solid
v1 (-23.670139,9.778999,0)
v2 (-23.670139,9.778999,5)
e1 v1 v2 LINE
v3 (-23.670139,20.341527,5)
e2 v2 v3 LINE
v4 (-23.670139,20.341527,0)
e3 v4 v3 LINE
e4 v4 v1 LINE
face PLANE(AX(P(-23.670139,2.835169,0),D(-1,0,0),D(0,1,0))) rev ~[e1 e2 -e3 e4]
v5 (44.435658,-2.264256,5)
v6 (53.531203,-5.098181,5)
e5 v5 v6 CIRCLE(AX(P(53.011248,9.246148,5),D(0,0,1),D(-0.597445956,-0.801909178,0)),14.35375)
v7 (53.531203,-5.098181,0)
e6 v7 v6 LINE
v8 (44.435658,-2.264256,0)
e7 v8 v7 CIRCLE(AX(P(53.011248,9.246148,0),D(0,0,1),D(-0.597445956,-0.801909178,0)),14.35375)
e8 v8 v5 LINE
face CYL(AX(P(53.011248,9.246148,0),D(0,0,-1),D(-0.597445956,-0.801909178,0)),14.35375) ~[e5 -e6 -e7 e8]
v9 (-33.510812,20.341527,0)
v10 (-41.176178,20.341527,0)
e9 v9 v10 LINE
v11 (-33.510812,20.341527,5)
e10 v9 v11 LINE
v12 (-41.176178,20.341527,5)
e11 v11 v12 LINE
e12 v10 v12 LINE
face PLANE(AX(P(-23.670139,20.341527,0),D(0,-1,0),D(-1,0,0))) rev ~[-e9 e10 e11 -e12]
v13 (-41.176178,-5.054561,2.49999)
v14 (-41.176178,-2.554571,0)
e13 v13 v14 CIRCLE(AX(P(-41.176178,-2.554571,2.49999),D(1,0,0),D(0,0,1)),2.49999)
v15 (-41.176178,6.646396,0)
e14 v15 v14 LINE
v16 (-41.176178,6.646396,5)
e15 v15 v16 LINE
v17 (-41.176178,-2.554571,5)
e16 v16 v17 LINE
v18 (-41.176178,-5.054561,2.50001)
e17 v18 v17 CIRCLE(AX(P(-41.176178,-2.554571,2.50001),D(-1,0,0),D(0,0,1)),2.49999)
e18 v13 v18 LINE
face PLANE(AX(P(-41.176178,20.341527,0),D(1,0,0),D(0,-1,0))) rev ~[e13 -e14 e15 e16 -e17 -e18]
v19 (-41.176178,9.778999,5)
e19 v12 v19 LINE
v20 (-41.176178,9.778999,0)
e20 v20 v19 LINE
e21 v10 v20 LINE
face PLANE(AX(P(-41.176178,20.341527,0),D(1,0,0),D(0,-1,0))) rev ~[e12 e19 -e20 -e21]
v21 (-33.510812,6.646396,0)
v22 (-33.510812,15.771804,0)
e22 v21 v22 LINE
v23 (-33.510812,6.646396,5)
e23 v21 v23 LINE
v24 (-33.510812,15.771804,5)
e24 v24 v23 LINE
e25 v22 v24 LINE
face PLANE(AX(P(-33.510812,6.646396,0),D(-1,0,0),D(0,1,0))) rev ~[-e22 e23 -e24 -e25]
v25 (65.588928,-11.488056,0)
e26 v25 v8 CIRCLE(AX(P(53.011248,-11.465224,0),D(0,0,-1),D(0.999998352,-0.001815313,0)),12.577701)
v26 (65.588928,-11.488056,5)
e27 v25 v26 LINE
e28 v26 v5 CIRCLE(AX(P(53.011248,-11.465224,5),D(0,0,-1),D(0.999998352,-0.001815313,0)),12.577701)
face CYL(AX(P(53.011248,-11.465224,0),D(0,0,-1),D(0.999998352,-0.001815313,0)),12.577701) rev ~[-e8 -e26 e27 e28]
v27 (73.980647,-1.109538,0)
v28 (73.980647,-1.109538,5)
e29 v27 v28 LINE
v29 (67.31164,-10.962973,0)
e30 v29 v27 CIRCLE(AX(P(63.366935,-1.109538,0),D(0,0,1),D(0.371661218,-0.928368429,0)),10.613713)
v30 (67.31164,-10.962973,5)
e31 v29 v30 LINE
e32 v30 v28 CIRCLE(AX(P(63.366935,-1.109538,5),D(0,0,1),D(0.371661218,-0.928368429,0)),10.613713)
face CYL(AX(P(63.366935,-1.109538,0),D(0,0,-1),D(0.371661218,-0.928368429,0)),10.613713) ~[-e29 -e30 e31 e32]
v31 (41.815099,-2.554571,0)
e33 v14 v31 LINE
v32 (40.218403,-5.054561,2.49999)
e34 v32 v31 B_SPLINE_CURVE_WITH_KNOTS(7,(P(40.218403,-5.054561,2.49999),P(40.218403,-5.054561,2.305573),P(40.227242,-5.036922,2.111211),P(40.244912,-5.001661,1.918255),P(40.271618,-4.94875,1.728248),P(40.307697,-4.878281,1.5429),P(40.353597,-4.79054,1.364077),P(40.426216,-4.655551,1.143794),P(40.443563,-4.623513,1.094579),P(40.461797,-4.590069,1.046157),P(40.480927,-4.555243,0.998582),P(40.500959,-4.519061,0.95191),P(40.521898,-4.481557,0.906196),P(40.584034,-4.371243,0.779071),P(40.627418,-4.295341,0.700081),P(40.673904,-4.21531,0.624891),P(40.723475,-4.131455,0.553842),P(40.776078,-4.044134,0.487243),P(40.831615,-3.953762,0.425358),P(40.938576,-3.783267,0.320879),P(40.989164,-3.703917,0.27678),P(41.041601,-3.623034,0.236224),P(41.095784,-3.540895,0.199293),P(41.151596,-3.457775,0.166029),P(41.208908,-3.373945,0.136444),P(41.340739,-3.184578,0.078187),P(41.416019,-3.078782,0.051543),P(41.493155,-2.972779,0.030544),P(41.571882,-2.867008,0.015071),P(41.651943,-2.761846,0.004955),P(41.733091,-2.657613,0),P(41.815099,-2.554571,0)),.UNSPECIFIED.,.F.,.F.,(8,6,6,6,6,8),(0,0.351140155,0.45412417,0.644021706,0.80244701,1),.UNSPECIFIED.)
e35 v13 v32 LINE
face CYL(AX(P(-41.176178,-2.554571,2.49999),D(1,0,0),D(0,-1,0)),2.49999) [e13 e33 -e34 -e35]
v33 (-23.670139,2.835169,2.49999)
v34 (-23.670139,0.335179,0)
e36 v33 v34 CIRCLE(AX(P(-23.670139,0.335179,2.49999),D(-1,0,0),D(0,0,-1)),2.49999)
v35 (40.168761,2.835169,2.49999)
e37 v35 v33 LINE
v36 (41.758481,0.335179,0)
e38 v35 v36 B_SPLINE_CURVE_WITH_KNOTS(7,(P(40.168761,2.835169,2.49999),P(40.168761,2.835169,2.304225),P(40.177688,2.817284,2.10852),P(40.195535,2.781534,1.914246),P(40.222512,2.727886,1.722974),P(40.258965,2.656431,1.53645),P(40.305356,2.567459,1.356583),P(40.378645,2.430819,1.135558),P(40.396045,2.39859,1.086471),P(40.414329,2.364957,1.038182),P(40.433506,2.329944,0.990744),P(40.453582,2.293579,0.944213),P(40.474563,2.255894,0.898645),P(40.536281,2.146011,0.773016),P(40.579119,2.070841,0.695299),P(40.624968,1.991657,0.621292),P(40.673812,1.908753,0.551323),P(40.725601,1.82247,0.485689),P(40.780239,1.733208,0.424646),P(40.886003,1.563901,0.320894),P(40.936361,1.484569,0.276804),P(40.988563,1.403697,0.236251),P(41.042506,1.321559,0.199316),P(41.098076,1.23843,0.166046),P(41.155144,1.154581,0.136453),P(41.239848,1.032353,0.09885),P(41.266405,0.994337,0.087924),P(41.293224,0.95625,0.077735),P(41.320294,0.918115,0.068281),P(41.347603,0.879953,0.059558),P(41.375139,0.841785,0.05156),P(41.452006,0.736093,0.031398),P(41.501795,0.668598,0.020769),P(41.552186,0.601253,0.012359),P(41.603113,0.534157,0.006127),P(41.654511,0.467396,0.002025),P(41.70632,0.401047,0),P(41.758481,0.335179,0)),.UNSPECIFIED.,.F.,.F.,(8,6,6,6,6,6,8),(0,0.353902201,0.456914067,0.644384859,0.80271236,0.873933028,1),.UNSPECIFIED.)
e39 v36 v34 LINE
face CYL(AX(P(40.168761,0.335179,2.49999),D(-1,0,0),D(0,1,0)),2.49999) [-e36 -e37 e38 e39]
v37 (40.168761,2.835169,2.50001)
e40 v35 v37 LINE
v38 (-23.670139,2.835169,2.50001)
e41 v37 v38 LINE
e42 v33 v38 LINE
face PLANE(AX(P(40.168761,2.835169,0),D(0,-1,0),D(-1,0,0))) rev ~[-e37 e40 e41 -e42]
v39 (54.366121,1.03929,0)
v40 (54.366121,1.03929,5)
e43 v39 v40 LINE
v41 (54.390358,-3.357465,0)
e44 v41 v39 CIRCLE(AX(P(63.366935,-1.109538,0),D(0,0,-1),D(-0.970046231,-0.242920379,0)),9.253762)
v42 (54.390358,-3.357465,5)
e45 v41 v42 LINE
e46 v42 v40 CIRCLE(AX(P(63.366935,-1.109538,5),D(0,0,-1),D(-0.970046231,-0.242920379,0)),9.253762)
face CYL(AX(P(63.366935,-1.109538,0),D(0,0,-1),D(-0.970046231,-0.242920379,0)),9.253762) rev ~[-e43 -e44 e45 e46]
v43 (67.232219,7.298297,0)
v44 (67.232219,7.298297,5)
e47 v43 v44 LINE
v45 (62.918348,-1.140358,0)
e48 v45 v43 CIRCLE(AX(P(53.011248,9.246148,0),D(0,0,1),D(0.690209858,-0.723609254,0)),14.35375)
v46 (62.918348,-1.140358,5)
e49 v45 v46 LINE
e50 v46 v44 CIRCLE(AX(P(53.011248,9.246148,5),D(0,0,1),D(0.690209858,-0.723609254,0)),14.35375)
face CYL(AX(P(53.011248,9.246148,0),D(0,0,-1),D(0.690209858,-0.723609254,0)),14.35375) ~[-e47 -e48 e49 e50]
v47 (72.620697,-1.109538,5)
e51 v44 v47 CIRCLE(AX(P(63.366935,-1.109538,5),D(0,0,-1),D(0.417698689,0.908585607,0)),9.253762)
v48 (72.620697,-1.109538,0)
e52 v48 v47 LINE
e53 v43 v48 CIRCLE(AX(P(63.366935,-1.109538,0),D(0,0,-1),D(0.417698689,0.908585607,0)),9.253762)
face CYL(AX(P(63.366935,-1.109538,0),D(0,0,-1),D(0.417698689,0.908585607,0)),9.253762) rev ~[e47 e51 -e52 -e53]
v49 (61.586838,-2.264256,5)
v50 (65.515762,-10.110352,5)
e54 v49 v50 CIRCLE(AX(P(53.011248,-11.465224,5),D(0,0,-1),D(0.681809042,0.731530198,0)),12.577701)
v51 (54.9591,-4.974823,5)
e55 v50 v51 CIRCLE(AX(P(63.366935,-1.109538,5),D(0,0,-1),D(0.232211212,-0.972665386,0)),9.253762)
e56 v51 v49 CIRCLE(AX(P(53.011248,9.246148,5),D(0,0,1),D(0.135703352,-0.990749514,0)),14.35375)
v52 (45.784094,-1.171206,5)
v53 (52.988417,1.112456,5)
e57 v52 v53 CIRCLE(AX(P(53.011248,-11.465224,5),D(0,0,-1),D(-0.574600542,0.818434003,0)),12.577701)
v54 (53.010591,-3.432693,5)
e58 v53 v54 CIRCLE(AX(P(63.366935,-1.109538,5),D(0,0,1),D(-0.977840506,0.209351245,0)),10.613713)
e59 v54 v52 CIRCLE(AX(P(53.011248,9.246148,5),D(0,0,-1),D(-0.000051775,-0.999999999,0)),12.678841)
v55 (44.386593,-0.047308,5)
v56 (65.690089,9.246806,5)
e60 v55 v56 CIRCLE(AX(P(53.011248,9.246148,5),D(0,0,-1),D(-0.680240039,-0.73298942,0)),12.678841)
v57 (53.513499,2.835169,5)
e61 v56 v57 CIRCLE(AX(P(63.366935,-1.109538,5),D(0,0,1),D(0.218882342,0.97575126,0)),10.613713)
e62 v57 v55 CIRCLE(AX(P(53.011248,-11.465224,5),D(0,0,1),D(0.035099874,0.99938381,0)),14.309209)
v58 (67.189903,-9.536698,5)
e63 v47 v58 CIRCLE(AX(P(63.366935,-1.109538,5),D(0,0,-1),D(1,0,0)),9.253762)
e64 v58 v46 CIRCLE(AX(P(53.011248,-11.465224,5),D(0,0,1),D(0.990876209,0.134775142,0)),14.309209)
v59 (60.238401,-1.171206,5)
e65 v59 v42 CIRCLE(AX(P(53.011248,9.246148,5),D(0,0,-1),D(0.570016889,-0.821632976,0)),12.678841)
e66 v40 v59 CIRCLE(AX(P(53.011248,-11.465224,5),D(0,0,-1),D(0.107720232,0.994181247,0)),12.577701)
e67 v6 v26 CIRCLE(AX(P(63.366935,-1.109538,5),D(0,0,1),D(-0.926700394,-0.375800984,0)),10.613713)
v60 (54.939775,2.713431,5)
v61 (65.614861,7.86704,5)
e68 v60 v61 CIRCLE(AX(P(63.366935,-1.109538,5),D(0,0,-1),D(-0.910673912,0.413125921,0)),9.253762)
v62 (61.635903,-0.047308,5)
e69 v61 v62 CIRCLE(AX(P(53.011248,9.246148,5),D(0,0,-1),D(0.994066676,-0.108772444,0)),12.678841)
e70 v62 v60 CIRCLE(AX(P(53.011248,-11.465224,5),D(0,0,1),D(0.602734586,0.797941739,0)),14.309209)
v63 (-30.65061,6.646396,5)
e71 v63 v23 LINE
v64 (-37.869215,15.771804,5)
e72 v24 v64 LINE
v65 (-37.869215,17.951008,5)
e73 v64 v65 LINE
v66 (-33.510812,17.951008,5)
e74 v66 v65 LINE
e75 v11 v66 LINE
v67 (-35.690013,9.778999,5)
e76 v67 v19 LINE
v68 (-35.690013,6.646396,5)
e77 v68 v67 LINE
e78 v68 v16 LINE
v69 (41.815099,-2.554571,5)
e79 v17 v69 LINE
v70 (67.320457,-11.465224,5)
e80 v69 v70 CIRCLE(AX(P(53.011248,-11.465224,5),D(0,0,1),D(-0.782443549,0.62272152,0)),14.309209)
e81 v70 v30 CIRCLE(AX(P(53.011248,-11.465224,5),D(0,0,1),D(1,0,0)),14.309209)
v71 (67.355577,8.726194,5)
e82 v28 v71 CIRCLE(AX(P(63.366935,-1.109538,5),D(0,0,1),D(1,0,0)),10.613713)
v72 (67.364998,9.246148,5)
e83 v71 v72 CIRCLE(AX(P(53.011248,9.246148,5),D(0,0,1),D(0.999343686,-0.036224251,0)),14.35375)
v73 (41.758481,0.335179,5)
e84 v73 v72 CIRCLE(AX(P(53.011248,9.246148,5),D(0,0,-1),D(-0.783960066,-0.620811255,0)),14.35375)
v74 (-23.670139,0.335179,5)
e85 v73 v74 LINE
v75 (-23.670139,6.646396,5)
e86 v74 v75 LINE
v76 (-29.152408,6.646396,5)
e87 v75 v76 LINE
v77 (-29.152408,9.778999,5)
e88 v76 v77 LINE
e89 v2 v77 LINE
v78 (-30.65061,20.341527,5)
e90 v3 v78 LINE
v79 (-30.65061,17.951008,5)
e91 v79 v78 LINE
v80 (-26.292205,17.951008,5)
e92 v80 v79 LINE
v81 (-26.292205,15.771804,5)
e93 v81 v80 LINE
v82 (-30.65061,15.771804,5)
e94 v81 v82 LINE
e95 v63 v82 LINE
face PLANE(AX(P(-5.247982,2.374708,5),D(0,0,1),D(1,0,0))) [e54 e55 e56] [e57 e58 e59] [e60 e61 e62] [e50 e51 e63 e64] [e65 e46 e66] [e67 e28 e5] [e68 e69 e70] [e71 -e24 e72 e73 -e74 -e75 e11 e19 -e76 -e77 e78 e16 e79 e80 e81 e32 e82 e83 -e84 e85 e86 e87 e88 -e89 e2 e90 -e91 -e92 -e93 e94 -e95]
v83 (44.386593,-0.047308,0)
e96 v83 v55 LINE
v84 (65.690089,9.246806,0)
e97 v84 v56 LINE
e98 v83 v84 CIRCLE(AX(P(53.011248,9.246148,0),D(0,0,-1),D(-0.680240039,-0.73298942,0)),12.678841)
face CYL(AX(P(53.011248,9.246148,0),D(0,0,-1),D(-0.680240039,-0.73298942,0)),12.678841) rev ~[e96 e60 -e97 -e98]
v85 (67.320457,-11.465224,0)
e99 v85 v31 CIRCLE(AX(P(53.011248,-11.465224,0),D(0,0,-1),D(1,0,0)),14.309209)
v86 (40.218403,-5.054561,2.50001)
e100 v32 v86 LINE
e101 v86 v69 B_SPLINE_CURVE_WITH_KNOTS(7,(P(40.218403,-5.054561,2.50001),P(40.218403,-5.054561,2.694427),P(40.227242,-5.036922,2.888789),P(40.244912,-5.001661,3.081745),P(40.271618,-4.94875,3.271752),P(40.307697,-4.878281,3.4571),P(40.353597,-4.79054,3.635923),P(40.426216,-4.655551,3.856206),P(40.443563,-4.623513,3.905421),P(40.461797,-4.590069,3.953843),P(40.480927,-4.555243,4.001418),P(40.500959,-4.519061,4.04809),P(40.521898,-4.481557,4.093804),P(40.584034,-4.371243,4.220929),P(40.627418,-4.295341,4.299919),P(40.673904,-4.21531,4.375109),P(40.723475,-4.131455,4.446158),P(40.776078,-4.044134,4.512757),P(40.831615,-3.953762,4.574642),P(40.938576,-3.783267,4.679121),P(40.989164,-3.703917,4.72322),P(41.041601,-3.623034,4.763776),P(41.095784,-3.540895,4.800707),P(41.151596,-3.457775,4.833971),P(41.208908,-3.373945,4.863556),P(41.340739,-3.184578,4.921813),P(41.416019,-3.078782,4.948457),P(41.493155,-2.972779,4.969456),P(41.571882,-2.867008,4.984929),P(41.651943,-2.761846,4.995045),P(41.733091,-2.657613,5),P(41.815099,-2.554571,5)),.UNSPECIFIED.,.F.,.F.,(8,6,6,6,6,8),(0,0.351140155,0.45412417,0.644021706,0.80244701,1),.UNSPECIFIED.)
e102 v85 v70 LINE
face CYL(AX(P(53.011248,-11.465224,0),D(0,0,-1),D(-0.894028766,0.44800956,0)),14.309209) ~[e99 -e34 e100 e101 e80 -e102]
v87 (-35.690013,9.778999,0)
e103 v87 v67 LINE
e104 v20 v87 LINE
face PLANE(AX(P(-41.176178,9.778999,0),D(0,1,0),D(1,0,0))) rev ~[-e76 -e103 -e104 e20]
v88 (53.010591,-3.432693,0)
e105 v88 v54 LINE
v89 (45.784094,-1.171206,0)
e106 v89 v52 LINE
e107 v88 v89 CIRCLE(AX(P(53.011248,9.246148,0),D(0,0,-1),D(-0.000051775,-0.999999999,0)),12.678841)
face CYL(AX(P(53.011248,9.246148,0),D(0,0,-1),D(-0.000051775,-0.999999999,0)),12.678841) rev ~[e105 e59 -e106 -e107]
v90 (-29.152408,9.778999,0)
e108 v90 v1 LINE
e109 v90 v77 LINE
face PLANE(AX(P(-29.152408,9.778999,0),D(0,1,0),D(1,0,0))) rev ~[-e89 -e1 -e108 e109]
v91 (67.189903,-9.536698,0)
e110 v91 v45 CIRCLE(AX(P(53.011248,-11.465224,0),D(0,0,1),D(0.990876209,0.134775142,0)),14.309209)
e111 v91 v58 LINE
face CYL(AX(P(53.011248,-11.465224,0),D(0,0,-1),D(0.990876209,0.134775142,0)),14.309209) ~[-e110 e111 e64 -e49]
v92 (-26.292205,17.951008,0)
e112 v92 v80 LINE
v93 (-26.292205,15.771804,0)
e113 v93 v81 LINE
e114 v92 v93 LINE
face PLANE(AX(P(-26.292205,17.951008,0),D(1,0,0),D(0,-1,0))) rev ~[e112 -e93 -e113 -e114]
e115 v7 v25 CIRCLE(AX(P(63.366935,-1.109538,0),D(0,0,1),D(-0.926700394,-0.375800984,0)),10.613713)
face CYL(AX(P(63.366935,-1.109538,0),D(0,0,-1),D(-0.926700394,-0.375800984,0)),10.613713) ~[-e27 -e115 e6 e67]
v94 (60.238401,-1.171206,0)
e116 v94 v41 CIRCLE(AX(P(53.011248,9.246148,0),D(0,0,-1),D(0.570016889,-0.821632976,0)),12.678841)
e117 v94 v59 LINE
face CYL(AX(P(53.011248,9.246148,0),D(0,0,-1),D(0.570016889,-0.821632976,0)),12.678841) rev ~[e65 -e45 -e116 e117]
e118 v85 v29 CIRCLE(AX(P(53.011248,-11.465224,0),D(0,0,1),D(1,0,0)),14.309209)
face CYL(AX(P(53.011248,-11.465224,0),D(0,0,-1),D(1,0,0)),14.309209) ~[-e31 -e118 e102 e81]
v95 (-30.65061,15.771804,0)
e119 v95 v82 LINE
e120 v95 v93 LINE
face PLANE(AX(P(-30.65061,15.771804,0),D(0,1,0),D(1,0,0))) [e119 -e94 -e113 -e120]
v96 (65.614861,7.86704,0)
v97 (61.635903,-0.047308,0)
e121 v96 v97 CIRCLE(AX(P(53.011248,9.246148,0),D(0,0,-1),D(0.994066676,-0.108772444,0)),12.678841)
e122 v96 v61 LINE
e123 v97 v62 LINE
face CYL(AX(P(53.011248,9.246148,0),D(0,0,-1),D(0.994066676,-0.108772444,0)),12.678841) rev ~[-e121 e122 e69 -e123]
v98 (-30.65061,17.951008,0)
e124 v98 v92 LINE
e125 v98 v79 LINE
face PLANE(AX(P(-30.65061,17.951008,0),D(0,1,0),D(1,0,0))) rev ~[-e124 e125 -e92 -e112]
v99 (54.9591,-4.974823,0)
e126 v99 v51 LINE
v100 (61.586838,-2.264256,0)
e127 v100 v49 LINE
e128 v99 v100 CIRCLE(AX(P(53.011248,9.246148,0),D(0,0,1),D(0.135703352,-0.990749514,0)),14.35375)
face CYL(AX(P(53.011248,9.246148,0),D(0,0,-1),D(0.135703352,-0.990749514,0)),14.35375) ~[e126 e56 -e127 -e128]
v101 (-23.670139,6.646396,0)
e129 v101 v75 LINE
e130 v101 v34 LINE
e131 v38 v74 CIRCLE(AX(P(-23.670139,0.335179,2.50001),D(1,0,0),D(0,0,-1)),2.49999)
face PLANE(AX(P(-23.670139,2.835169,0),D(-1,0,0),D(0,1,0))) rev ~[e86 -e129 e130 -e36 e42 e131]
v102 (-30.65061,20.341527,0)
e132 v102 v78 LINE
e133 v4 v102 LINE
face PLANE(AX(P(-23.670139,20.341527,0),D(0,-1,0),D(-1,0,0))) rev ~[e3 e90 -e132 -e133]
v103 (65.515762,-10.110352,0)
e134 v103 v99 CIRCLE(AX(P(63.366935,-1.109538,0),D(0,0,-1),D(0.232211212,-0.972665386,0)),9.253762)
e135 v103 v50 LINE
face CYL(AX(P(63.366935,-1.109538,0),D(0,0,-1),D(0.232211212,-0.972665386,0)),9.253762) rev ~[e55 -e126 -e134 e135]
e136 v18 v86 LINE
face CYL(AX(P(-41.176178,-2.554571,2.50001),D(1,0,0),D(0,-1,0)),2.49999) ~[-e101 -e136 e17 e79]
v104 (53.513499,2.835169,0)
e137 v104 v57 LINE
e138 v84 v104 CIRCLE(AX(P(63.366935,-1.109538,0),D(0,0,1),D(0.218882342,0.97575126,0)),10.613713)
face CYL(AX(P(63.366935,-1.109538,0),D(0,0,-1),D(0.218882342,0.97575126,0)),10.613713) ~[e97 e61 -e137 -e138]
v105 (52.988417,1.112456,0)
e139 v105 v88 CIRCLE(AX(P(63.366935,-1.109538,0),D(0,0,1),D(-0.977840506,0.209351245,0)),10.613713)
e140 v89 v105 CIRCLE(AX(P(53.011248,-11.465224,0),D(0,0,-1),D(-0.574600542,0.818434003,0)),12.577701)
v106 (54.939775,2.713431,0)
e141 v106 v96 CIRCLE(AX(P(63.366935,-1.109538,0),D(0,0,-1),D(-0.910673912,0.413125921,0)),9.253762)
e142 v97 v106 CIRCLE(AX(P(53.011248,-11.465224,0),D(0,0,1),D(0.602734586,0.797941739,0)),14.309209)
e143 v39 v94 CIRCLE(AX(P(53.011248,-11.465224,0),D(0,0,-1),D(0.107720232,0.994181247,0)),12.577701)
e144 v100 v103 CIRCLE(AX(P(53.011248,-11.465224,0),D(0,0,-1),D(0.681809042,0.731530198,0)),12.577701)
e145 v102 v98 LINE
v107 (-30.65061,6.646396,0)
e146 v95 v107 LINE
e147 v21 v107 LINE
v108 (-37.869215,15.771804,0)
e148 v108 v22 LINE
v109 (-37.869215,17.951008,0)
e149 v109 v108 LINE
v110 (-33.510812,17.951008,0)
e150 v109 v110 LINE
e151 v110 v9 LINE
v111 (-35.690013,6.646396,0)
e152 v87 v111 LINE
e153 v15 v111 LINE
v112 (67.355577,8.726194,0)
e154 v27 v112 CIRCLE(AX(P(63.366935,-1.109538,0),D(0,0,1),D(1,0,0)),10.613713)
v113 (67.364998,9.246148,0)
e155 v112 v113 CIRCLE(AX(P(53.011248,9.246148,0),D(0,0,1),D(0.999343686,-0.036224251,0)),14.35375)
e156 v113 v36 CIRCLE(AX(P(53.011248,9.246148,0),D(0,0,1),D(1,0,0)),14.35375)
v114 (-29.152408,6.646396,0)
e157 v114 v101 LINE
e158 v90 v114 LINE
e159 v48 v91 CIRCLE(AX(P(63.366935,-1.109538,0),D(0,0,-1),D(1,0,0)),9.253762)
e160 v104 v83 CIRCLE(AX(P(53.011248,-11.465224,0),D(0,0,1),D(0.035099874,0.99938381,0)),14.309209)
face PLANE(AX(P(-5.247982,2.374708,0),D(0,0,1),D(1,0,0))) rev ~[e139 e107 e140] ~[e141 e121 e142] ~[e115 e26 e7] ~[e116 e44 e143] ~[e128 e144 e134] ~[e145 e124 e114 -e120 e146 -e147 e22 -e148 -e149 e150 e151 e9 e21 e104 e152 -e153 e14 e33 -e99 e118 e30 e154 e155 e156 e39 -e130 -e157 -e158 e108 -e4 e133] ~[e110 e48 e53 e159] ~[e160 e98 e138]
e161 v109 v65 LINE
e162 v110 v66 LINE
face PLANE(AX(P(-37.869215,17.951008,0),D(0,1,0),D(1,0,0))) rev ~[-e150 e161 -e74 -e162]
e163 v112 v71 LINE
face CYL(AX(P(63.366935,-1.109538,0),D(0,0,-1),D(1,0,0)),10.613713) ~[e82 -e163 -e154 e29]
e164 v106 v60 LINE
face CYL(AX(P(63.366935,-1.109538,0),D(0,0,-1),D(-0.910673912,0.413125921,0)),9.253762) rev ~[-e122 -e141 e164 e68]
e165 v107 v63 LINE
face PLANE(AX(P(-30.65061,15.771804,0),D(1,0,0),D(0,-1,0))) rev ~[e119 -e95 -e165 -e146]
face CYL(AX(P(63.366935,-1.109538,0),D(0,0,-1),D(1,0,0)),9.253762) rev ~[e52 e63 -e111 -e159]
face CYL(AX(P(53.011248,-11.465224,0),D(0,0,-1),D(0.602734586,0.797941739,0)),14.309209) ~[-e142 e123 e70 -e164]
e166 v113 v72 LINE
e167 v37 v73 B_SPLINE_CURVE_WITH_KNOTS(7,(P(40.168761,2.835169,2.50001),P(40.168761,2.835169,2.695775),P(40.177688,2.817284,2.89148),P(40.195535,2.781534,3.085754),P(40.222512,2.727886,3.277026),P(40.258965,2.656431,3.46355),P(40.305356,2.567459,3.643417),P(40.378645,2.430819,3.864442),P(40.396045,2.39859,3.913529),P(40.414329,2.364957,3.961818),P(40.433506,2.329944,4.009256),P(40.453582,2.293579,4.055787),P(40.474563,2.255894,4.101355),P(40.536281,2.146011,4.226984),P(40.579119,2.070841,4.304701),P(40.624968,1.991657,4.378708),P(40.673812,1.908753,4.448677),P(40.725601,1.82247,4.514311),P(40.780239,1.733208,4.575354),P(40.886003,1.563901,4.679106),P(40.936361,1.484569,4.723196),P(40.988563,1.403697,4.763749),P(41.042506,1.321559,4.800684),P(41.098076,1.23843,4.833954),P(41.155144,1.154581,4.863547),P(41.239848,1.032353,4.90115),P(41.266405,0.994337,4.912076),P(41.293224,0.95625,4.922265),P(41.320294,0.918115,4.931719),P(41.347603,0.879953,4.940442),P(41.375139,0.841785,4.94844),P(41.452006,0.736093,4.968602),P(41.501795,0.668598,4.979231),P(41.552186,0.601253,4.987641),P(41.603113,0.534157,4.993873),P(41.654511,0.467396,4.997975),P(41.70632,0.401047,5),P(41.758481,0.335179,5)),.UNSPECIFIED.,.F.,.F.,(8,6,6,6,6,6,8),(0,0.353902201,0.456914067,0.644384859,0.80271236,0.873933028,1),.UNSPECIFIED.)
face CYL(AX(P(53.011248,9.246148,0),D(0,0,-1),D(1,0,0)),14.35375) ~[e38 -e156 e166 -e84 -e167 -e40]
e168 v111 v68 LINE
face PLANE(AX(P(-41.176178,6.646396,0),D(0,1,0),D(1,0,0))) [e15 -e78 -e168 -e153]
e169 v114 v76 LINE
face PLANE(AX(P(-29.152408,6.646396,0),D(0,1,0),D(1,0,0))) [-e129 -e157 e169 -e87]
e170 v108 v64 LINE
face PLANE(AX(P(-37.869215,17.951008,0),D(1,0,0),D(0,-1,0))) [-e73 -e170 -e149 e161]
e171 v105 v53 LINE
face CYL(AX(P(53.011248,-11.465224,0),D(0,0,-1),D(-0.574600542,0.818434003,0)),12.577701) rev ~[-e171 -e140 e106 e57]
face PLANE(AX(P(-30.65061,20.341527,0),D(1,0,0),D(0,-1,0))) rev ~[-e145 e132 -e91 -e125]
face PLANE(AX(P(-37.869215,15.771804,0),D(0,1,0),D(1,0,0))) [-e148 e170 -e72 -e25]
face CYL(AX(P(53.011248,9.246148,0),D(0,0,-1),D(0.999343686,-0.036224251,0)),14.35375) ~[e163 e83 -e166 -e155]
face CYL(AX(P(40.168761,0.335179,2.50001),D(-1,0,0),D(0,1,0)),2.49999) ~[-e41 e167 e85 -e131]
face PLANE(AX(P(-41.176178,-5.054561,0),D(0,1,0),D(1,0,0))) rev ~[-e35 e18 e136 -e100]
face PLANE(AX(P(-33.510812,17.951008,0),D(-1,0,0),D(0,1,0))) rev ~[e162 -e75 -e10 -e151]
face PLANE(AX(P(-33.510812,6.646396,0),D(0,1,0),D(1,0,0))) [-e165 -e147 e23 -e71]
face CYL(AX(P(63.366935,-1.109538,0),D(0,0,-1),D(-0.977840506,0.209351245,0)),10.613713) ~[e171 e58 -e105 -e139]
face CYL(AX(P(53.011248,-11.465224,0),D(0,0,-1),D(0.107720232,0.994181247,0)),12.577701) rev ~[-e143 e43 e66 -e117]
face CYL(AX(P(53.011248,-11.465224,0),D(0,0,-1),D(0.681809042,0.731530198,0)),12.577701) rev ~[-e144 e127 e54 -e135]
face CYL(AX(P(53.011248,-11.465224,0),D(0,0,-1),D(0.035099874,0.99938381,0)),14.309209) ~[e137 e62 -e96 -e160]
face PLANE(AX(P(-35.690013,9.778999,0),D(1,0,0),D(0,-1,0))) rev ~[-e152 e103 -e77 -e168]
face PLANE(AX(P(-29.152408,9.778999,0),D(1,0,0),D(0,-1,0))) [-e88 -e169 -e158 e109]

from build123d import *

# Parameters (mm, degrees)
F1_DEPTH = 5
F2_R     = 2.49999
F3_W     = 5.486164242
F3_H     = 3.1326031312
F3_W_2   = 5.482269451
F3_W_3   = 2.8602015227
F3_H_2   = 9.1254087165
F3_H_3   = 2.179203555
F3_H_4   = 2.3905187845
F3_W_4   = 4.3584052473
F3_W_5   = 4.3584033847
F4_DEPTH = 25


# Not quite as in the source:
# - a fillet or chamfer is up to 0.001 mm smaller than in the source, because OpenCascade refuses the exact size


with BuildPart() as f1:
    # F0 (on Top) → F1 (new body)
    with BuildSketch(Plane.XY):
        with BuildLine():
            ThreePointArc((43.1041480843, -1.140358212), (41.4640780002, 0.7201286462), (40.168760519, 2.8351685639))
            Line((40.168760519, 2.8351685639), (-23.6701387912, 2.8351685639))
            Line((-23.6701387912, 2.8351685639), (-23.6701387912, 20.3415267169))
            Line((-23.6701387912, 20.3415267169), (-41.1761775613, 20.3415267169))
            Line((-41.1761775613, 20.3415267169), (-41.1761775613, 2.8351685639))
            Line((-41.1761775613, 2.8351685639), (-41.1761775613, -5.0545609556))
            Line((-41.1761775613, -5.0545609556), (40.2184031878, -5.0545609556))
            ThreePointArc((40.2184031878, -5.0545609556), (41.4937778577, -2.9739718927), (43.1041480843, -1.140358212))
        make_face()
        with BuildLine():
            ThreePointArc((67.3555774067, 8.7261943334), (67.3626426338, 8.9861285841), (67.3649979671, 9.246148169))
            ThreePointArc((67.3649979671, 9.246148169), (49.7178994981, 23.2169748342), (40.168760519, 2.8351685639))
            ThreePointArc((40.168760519, 2.8351685639), (41.4640780002, 0.7201286462), (43.1041480843, -1.140358212))
            ThreePointArc((43.1041480843, -1.140358212), (43.7292665999, -0.5749391558), (44.3865925628, -0.0473081805))
            ThreePointArc((44.3865925628, -0.0473081805), (47.9413125892, 20.8671965928), (65.6900889224, 9.2468057623))
            ThreePointArc((65.6900889224, 9.2468057623), (66.5335502723, 9.0207851567), (67.3555774067, 8.7261943334))
        make_face()
        with BuildLine():
            ThreePointArc((44.4356579567, -2.2642557619), (43.7528332621, -1.7225299618), (43.1041480843, -1.140358212))
            ThreePointArc((43.1041480843, -1.140358212), (41.4937778577, -2.9739718927), (40.2184031878, -5.0545609556))
            ThreePointArc((40.2184031878, -5.0545609556), (49.7174675435, -25.3901824255), (67.3204571559, -11.4652235061))
            ThreePointArc((67.3204571559, -11.4652235061), (67.3182526979, -11.2140597341), (67.3116400033, -10.96297335))
            ThreePointArc((67.3116400033, -10.96297335), (66.4614410979, -11.2621198468), (65.5889276735, -11.4880559652))
            ThreePointArc((65.5889276735, -11.4880559652), (47.9839421141, -22.9945229972), (44.4356579567, -2.2642557619))
        make_face()
        with BuildLine():
            ThreePointArc((73.9806472497, -1.1095376685), (72.169922865, 4.8199052741), (67.3555774067, 8.7261943334))
            ThreePointArc((67.3555774067, 8.7261943334), (67.3117311725, 8.010705268), (67.2322189831, 7.2982974448))
            ThreePointArc((67.2322189831, 7.2982974448), (71.1579723309, 3.8836422981), (72.6206968225, -1.1095376685))
            ThreePointArc((72.6206968225, -1.1095376685), (71.1453970138, -6.1222851765), (67.1899029185, -9.5366978003))
            ThreePointArc((67.1899029185, -9.5366978003), (67.2686178092, -10.2483123334), (67.3116400033, -10.96297335))
            ThreePointArc((67.3116400033, -10.96297335), (72.1566691186, -7.0586101253), (73.9806472497, -1.1095376685))
        make_face()
        with BuildLine():
            ThreePointArc((54.9590998914, -4.9748227507), (54.2466920753, -5.0543350042), (53.5312030139, -5.0981813027))
            ThreePointArc((53.5312030139, -5.0981813027), (58.3970374227, -10.4877579943), (65.5889276735, -11.4880559652))
            ThreePointArc((65.5889276735, -11.4880559652), (65.5889432165, -11.4766397403), (65.5889483975, -11.4652235061))
            ThreePointArc((65.5889483975, -11.4652235061), (65.5706384672, -10.7868000494), (65.5157619854, -10.1103518165))
            ThreePointArc((65.5157619854, -10.1103518165), (59.3188229712, -9.4308900821), (54.9590998914, -4.9748227507))
        make_face()
        with BuildLine():
            ThreePointArc((54.3661207024, 1.0392904692), (53.6782725799, 1.094777615), (52.9884165603, 1.1124562812))
            ThreePointArc((52.9884165603, 1.1124562812), (52.7533483797, -1.1613192361), (53.0105914352, -3.4326928652))
            ThreePointArc((53.0105914352, -3.4326928652), (53.7015001008, -3.4138898359), (54.3903575498, -3.3574650805))
            ThreePointArc((54.3903575498, -3.3574650805), (54.1133130855, -1.1605476943), (54.3661207024, 1.0392904692))
        make_face()
        with BuildLine():
            ThreePointArc((65.6900889395, 9.246148169), (65.6900889352, 9.2464769657), (65.6900889224, 9.2468057623))
            ThreePointArc((65.6900889224, 9.2468057623), (58.421880956, 8.2818061592), (53.5134993303, 2.8351685639))
            ThreePointArc((53.5134993303, 2.8351685639), (54.2281603431, 2.7921463054), (54.9397748692, 2.7134313507))
            ThreePointArc((54.9397748692, 2.7134313507), (59.3437953002, 7.2239168329), (65.6148612618, 7.867039641))
            ThreePointArc((65.6148612618, 7.867039641), (65.6712680509, 8.5555687863), (65.6900889395, 9.246148169))
        make_face()
        with BuildLine():
            ThreePointArc((60.2384014175, -1.1712057304), (60.9570485035, -0.6339967178), (61.6359032137, -0.0473081805))
            ThreePointArc((61.6359032137, -0.0473081805), (58.4654054664, 1.7637460297), (54.9397748692, 2.7134313507))
            ThreePointArc((54.9397748692, 2.7134313507), (54.6128353821, 1.8901056598), (54.3661207024, 1.0392904692))
            ThreePointArc((54.3661207024, 1.0392904692), (57.4423163149, 0.3061053356), (60.2384014175, -1.1712057304))
        make_face()
        with BuildLine():
            ThreePointArc((53.5134993303, 2.8351685639), (48.7018941946, 2.1796634707), (44.3865925628, -0.0473081805))
            ThreePointArc((44.3865925628, -0.0473081805), (45.0654472729, -0.6339967178), (45.7840943589, -1.1712057304))
            ThreePointArc((45.7840943589, -1.1712057304), (49.2106758058, 0.5245305343), (52.9884165603, 1.1124562812))
            ThreePointArc((52.9884165603, 1.1124562812), (53.2143527571, 1.9849696853), (53.5134993303, 2.8351685639))
        make_face()
        with BuildLine():
            ThreePointArc((44.3865925628, -0.0473081805), (43.7292665999, -0.5749391558), (43.1041480843, -1.140358212))
            ThreePointArc((43.1041480843, -1.140358212), (43.7528332621, -1.7225299618), (44.4356579567, -2.2642557619))
            ThreePointArc((44.4356579567, -2.2642557619), (45.0909975882, -1.6944412812), (45.7840943589, -1.1712057304))
            ThreePointArc((45.7840943589, -1.1712057304), (45.0654472729, -0.6339967178), (44.3865925628, -0.0473081805))
        make_face()
        with BuildLine():
            ThreePointArc((45.7840943589, -1.1712057304), (45.0909975882, -1.6944412812), (44.4356579567, -2.2642557619))
            ThreePointArc((44.4356579567, -2.2642557619), (48.7414590733, -4.4578309904), (53.5312030139, -5.0981813027))
            ThreePointArc((53.5312030139, -5.0981813027), (53.2366121166, -4.2761541948), (53.0105914352, -3.4326928652))
            ThreePointArc((53.0105914352, -3.4326928652), (49.2245751666, -2.854022082), (45.7840943589, -1.1712057304))
        make_face()
        with BuildLine():
            ThreePointArc((53.0105914352, -3.4326928652), (53.2366121166, -4.2761541948), (53.5312030139, -5.0981813027))
            ThreePointArc((53.5312030139, -5.0981813027), (54.2466920753, -5.0543350042), (54.9590998914, -4.9748227507))
            ThreePointArc((54.9590998914, -4.9748227507), (54.6371920778, -4.1793436416), (54.3903575498, -3.3574650805))
            ThreePointArc((54.3903575498, -3.3574650805), (53.7015001008, -3.4138898359), (53.0105914352, -3.4326928652))
        make_face()
        with BuildLine():
            ThreePointArc((54.9397748692, 2.7134313507), (54.2281603431, 2.7921463054), (53.5134993303, 2.8351685639))
            ThreePointArc((53.5134993303, 2.8351685639), (53.2143527571, 1.9849696853), (52.9884165603, 1.1124562812))
            ThreePointArc((52.9884165603, 1.1124562812), (53.6782725799, 1.094777615), (54.3661207024, 1.0392904692))
            ThreePointArc((54.3661207024, 1.0392904692), (54.6128353821, 1.8901056598), (54.9397748692, 2.7134313507))
        make_face()
        with BuildLine():
            ThreePointArc((54.9590998914, -4.9748227507), (58.4447091137, -4.0394696351), (61.5868378197, -2.2642557619))
            ThreePointArc((61.5868378197, -2.2642557619), (60.9314981882, -1.6944412812), (60.2384014175, -1.1712057304))
            ThreePointArc((60.2384014175, -1.1712057304), (57.4510535162, -2.6299259461), (54.3903575498, -3.3574650805))
            ThreePointArc((54.3903575498, -3.3574650805), (54.6371920778, -4.1793436416), (54.9590998914, -4.9748227507))
        make_face()
        with BuildLine():
            ThreePointArc((61.5868378197, -2.2642557619), (62.2696625143, -1.7225299618), (62.9183476921, -1.140358212))
            ThreePointArc((62.9183476921, -1.140358212), (62.2932291765, -0.5749391558), (61.6359032137, -0.0473081805))
            ThreePointArc((61.6359032137, -0.0473081805), (60.9570485035, -0.6339967178), (60.2384014175, -1.1712057304))
            ThreePointArc((60.2384014175, -1.1712057304), (60.9314981882, -1.6944412812), (61.5868378197, -2.2642557619))
        make_face()
        with BuildLine():
            ThreePointArc((62.9183476921, -1.140358212), (65.7918456304, 2.7126603808), (67.2322189831, 7.2982974448))
            ThreePointArc((67.2322189831, 7.2982974448), (66.4367398451, 7.6202051868), (65.6148612618, 7.867039641))
            ThreePointArc((65.6148612618, 7.867039641), (64.3390487935, 3.5510680946), (61.6359032137, -0.0473081805))
            ThreePointArc((61.6359032137, -0.0473081805), (62.2932291765, -0.5749391558), (62.9183476921, -1.140358212))
        make_face()
        with BuildLine():
            ThreePointArc((67.2322189831, 7.2982974448), (67.3117311725, 8.010705268), (67.3555774067, 8.7261943334))
            ThreePointArc((67.3555774067, 8.7261943334), (66.5335502723, 9.0207851567), (65.6900889224, 9.2468057623))
            ThreePointArc((65.6900889224, 9.2468057623), (65.6900889352, 9.2464769657), (65.6900889395, 9.246148169))
            ThreePointArc((65.6900889395, 9.246148169), (65.6712680509, 8.5555687863), (65.6148612618, 7.867039641))
            ThreePointArc((65.6148612618, 7.867039641), (66.4367398451, 7.6202051868), (67.2322189831, 7.2982974448))
        make_face()
        with BuildLine():
            ThreePointArc((67.1899029185, -9.5366978003), (65.7648954489, -4.9769306827), (62.9183476921, -1.140358212))
            ThreePointArc((62.9183476921, -1.140358212), (62.2696625143, -1.7225299618), (61.5868378197, -2.2642557619))
            ThreePointArc((61.5868378197, -2.2642557619), (64.2577141016, -5.8335676384), (65.5157619854, -10.1103518165))
            ThreePointArc((65.5157619854, -10.1103518165), (66.3665771981, -9.8636372133), (67.1899029185, -9.5366978003))
        make_face()
        with BuildLine():
            ThreePointArc((65.5889276735, -11.4880559652), (66.4614410979, -11.2621198468), (67.3116400033, -10.96297335))
            ThreePointArc((67.3116400033, -10.96297335), (67.2686178092, -10.2483123334), (67.1899029185, -9.5366978003))
            ThreePointArc((67.1899029185, -9.5366978003), (66.3665771981, -9.8636372133), (65.5157619854, -10.1103518165))
            ThreePointArc((65.5157619854, -10.1103518165), (65.5706384672, -10.7868000494), (65.5889483975, -11.4652235061))
            ThreePointArc((65.5889483975, -11.4652235061), (65.5889432165, -11.4766397403), (65.5889276735, -11.4880559652))
        make_face()
    extrude(amount=F1_DEPTH)

    # F2 (radius 2.5 in the source; OpenCascade refuses exactly that, so slightly less here)
    f2_edges = [f1.edges().sort_by_distance(p)[0] for p in [
        (-0.478887, -5.054561, 5),
        (-0.478887, -5.054561, 0),
        (8.249311, 2.835169, 5),
        (8.249311, 2.835169, 0),
    ]]
    fillet(f2_edges, radius=F2_R)

    # F3 (on face) → F4 (cut)
    with BuildSketch(Plane(origin=(0, 0, 0), x_dir=(1, 0, 0), z_dir=(0, 0, -1))):
        with Locations((-38.4330954403, -8.2126972266)):
            Rectangle(F3_W, F3_H)
        with Locations((-26.4112735167, -8.2126972266)):
            Rectangle(F3_W_2, F3_H)
        with Locations((-32.0807108656, -11.2091000192)):
            Rectangle(F3_W_3, F3_H_2)
        with Locations((-32.0807108656, -16.8614061549)):
            Rectangle(F3_W_3, F3_H_3)
        with Locations((-32.0807108656, -19.1462673247)):
            Rectangle(F3_W_3, F3_H_4)
        with Locations((-28.4714074805, -16.8614061549)):
            Rectangle(F3_W_4, F3_H_3)
        with Locations((-35.6900133193, -16.8614061549)):
            Rectangle(F3_W_5, F3_H_3)
    extrude(amount=-F4_DEPTH, mode=Mode.SUBTRACT)


solid = f1.part
